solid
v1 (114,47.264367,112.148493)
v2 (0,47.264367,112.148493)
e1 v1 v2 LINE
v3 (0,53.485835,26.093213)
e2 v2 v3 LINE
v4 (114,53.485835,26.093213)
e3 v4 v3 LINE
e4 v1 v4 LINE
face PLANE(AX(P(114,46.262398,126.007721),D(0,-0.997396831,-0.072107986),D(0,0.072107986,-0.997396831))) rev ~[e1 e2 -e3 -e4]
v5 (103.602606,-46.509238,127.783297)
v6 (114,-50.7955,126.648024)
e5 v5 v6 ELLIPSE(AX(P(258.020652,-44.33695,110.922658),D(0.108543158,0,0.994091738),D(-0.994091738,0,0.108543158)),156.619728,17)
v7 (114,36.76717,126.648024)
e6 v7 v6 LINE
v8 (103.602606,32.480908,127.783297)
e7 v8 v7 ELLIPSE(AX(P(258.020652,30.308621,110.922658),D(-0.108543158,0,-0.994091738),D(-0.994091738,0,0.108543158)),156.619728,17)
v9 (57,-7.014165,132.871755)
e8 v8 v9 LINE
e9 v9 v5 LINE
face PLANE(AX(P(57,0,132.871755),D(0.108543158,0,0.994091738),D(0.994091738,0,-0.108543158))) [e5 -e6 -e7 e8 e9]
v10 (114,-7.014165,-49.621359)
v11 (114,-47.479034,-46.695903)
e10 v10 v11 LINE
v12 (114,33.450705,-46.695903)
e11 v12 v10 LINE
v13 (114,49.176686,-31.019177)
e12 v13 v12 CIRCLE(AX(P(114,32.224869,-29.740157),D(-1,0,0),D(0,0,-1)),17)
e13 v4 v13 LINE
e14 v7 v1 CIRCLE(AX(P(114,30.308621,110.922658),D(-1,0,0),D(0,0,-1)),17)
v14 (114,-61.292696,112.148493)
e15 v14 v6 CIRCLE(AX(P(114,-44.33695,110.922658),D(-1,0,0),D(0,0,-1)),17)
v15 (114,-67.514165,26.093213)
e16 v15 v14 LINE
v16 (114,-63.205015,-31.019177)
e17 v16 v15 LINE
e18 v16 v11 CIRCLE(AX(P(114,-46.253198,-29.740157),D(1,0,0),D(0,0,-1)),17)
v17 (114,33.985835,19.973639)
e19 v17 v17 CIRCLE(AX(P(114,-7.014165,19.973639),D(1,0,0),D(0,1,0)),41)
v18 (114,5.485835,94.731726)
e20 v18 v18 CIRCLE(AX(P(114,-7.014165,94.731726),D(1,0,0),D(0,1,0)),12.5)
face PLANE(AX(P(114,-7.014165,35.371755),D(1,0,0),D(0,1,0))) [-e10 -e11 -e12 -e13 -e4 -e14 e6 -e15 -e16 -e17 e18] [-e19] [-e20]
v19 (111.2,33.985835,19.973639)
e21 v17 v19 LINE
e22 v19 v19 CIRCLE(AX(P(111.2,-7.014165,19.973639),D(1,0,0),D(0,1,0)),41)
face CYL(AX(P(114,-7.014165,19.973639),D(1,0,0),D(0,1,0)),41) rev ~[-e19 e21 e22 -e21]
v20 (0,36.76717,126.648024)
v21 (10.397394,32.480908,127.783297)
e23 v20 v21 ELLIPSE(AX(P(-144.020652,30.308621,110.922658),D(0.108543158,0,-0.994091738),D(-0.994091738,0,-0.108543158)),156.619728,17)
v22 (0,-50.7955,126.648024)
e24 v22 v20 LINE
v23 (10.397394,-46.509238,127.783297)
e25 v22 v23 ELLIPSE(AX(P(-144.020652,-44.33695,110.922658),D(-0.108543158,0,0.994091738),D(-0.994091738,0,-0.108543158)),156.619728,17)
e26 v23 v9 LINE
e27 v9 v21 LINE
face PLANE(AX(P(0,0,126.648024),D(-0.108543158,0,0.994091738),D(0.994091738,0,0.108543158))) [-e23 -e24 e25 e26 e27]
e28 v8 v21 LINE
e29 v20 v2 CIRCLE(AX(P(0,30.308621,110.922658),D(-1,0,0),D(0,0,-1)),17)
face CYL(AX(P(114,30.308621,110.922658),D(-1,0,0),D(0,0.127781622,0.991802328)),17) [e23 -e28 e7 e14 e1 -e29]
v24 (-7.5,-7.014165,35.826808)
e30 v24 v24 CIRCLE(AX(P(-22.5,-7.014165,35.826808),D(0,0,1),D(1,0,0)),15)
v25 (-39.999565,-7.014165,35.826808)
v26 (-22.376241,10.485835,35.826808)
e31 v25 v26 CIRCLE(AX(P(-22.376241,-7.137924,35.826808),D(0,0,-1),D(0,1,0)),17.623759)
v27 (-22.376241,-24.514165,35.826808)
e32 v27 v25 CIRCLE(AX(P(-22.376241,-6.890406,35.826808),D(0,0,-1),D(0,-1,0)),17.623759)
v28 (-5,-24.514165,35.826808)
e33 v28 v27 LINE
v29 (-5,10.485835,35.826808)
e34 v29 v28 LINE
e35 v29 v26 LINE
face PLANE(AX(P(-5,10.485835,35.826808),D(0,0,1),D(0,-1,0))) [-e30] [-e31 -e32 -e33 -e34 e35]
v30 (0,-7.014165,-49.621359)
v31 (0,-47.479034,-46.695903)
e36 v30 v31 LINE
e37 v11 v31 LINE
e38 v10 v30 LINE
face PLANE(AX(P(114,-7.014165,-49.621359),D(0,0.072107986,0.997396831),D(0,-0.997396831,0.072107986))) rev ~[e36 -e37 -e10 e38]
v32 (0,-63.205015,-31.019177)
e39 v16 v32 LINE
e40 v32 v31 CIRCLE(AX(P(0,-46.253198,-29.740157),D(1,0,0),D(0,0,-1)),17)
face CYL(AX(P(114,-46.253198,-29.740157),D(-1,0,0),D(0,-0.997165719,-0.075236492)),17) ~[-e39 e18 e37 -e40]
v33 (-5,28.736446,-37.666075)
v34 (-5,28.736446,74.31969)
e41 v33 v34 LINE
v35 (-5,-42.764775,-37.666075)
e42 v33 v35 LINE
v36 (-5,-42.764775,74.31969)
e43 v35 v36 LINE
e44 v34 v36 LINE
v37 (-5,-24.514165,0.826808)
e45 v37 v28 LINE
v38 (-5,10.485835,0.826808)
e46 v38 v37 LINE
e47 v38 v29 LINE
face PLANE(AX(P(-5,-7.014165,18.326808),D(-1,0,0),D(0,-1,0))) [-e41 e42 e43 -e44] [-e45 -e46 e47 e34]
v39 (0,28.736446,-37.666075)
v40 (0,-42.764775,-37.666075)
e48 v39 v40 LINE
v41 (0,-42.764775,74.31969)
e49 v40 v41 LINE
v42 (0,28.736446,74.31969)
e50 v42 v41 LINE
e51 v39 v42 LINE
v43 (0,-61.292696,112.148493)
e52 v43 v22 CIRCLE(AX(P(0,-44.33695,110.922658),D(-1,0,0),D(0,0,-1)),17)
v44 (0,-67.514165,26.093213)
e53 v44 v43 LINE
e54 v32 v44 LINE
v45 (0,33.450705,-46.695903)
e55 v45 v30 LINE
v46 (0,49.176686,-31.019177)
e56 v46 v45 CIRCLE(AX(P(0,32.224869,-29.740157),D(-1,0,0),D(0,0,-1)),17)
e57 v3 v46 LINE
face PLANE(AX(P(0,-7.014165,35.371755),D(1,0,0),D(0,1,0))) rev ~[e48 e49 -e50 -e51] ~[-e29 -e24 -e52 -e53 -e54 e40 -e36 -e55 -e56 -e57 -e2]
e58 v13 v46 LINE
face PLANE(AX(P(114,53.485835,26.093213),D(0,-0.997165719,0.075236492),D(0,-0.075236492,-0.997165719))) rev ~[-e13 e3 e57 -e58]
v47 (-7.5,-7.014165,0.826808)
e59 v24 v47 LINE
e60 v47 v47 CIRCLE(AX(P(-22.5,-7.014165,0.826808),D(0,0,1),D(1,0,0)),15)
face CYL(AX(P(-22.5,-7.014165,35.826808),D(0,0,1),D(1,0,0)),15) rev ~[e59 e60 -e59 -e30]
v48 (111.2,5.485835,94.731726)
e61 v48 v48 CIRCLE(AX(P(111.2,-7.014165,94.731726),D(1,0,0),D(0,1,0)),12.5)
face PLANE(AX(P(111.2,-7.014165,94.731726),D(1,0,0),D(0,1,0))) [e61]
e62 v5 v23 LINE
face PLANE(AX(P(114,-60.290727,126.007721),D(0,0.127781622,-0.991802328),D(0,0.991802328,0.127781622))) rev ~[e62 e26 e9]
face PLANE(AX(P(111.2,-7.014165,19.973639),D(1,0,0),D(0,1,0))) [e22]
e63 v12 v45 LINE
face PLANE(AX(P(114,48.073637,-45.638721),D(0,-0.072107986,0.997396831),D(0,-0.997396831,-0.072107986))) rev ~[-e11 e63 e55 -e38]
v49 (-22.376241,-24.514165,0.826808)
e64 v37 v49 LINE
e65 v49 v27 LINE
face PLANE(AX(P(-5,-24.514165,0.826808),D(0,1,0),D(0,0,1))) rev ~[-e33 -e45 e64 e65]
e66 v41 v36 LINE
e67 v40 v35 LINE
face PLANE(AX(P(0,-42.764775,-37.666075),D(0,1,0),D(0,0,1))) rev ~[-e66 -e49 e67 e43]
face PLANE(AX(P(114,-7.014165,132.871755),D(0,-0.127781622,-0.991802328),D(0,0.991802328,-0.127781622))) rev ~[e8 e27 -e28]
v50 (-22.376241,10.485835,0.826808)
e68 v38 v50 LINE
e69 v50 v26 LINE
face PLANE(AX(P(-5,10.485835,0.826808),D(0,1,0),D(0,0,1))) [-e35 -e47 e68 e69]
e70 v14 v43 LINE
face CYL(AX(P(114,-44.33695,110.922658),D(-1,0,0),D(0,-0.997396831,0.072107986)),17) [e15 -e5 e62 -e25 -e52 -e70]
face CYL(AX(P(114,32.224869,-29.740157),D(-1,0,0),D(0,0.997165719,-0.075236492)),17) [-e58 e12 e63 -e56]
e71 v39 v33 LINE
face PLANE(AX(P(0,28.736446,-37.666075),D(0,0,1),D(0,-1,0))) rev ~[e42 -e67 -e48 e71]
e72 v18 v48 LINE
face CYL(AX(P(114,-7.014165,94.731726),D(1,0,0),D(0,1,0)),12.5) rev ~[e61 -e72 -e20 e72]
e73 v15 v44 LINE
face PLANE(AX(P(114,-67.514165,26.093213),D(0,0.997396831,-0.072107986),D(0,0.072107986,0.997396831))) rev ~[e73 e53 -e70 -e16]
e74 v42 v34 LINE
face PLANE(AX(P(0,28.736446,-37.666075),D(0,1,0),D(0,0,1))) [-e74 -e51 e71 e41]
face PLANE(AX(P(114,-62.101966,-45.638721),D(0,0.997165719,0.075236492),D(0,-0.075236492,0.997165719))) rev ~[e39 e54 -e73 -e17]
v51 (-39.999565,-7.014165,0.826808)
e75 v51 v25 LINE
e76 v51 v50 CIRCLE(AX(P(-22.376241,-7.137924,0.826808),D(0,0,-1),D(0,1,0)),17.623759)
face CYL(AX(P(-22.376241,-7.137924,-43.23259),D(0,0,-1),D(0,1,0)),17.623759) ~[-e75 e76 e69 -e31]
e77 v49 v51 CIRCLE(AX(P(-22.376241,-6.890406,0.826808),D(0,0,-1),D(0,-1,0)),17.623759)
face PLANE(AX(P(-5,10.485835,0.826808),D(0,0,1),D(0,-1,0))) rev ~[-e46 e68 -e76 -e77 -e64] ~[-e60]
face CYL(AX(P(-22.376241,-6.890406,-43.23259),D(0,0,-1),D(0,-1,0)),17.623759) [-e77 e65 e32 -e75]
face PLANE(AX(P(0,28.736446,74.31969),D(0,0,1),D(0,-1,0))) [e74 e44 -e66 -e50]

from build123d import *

# Parameters (mm, degrees)
F0_W         = 121
F0_H         = 195
F1_DEPTH     = 114
F3_DEPTH     = 114
F4_R         = 17
F6_DEPTH     = 134.1
F7_DEPTH     = 135.6
F2_R         = 41
F2_R_2       = 12.5
F8_DEPTH     = 2.8
F9_W         = 71.5012215078
F9_H         = 111.9857653975
F10_DEPTH    = 5
F11_W        = 35
F11_H        = 35
F12_DEPTH    = 35
F13_R        = 15
F14_DEPTH    = 35
F15_T1_DEPTH = 123.1187950266


# Not quite as in the source:
# - a fillet or chamfer that OpenCascade refuses, or shapes differently, is made with other operations: its cross-section is extruded or revolved along the edge and cut away or added


with BuildPart() as f1:
    # F0 (on Right) → F1 (new body)
    with BuildSketch(Plane.YZ):
        with Locations((-7.0141647011, 35.3717551942)):
            Rectangle(F0_W, F0_H)
    extrude(amount=F1_DEPTH)

    # F2 (on face) → F3 (cut, through all)
    with BuildSketch(Plane.YZ.offset(114)):
        Polygon((-60.2907269257, 126.0077205761), (-7.0141647011, 132.8717551942), (-67.5141647011, 132.8717551942), (-67.5141647011, 26.0932128876), align=None)
        Polygon((53.4858352989, 132.8717551942), (-7.0141647011, 132.8717551942), (46.2623975235, 126.0077205761), (53.4858352989, 26.0932128876), align=None)
        Polygon((-62.1019659576, -45.638720619), (-67.5141647011, 26.0932128876), (-67.5141647011, -62.1282448058), (53.4858352989, -62.1282448058), (53.4858352989, 26.0932128876), (48.0736365554, -45.638720619), (-7.0141647011, -49.6213585138), align=None)
    extrude(amount=-F3_DEPTH, mode=Mode.SUBTRACT)

    # F4
    f4_edges = [f1.edges().sort_by_distance(p)[0] for p in [
        (57, -60.290727, 126.007721),
        (57, 46.262398, 126.007721),
        (57, 48.073637, -45.638721),
        (57, -62.101966, -45.638721),
    ]]
    fillet(f4_edges, radius=F4_R)

    # F5 (on Front) → F6 (cut)
    with BuildSketch(Plane.XZ):
        Polygon((56.9999999998, 132.8717551942), (-2e-10, 132.8717551942), (-2e-10, 126.6480237246), align=None)
        Polygon((113.9999999999, 132.8717551942), (56.9999999998, 132.8717551942), (113.9999999999, 126.6480237246), align=None)
    extrude(amount=-F6_DEPTH, mode=Mode.SUBTRACT)

    # F5 (on Front) → F7 (cut)
    with BuildSketch(Plane.XZ):
        Polygon((56.9999999998, 132.8717551942), (-2e-10, 132.8717551942), (-2e-10, 126.6480237246), align=None)
        Polygon((113.9999999999, 132.8717551942), (56.9999999998, 132.8717551942), (113.9999999999, 126.6480237246), align=None)
    extrude(amount=F7_DEPTH, mode=Mode.SUBTRACT)

    # F2 (on face) → F8 (cut)
    with BuildSketch(Plane.YZ.offset(114)):
        with Locations((-7.0141647011, 19.9736393988)):
            Circle(F2_R)
        with Locations((-7.0141647011, 94.7317257524)):
            Circle(F2_R_2)
    extrude(amount=-F8_DEPTH, mode=Mode.SUBTRACT)

    # F9 (on face) → F10 (join)
    with BuildSketch(Plane(origin=(0, 0, 0), x_dir=(0, -1, 0), z_dir=(-1, 0, 0))):
        with Locations((7.0141647011, 18.3268077672)):
            Rectangle(F9_W, F9_H)
    extrude(amount=F10_DEPTH)

    # F11 (on face) → F12 (join)
    with BuildSketch(Plane(origin=(-5, 0, 0), x_dir=(0, -1, 0), z_dir=(-1, 0, 0))):
        with Locations((7.0141647011, 18.3268077672)):
            Rectangle(F11_W, F11_H)
    extrude(amount=F12_DEPTH)

    # F13 (on face) → F14 (cut, through all)
    with BuildSketch(Plane.XY.offset(35.8268077672)):
        with Locations((-22.5, -7.0141647011)):
            Circle(F13_R)
    extrude(amount=-F14_DEPTH, mode=Mode.SUBTRACT)

    # F15: fillet of radius 17.6237590053 on 2 edges, made by hand

    # F15_s2 → F15_t1 (cut)
    with BuildSketch(Plane.XY.offset(-43.2325897462)):
        with BuildLine():
            ThreePointArc((-22.3762409947, -24.5141647011), (-34.8381204973, -19.3522851984), (-40, -6.8904056958))
            Line((-40, -6.8904056958), (-40, -24.5141647011))
            Line((-40, -24.5141647011), (-22.3762409947, -24.5141647011))
        make_face()
        with BuildLine():
            ThreePointArc((-22.3762409947, 10.4858352989), (-34.8381204973, 5.3239557962), (-40, -7.1379237064))
            Line((-40, -7.1379237064), (-40, 10.4858352989))
            Line((-40, 10.4858352989), (-22.3762409947, 10.4858352989))
        make_face()
    extrude(amount=F15_T1_DEPTH, mode=Mode.SUBTRACT)


solid = f1.part
